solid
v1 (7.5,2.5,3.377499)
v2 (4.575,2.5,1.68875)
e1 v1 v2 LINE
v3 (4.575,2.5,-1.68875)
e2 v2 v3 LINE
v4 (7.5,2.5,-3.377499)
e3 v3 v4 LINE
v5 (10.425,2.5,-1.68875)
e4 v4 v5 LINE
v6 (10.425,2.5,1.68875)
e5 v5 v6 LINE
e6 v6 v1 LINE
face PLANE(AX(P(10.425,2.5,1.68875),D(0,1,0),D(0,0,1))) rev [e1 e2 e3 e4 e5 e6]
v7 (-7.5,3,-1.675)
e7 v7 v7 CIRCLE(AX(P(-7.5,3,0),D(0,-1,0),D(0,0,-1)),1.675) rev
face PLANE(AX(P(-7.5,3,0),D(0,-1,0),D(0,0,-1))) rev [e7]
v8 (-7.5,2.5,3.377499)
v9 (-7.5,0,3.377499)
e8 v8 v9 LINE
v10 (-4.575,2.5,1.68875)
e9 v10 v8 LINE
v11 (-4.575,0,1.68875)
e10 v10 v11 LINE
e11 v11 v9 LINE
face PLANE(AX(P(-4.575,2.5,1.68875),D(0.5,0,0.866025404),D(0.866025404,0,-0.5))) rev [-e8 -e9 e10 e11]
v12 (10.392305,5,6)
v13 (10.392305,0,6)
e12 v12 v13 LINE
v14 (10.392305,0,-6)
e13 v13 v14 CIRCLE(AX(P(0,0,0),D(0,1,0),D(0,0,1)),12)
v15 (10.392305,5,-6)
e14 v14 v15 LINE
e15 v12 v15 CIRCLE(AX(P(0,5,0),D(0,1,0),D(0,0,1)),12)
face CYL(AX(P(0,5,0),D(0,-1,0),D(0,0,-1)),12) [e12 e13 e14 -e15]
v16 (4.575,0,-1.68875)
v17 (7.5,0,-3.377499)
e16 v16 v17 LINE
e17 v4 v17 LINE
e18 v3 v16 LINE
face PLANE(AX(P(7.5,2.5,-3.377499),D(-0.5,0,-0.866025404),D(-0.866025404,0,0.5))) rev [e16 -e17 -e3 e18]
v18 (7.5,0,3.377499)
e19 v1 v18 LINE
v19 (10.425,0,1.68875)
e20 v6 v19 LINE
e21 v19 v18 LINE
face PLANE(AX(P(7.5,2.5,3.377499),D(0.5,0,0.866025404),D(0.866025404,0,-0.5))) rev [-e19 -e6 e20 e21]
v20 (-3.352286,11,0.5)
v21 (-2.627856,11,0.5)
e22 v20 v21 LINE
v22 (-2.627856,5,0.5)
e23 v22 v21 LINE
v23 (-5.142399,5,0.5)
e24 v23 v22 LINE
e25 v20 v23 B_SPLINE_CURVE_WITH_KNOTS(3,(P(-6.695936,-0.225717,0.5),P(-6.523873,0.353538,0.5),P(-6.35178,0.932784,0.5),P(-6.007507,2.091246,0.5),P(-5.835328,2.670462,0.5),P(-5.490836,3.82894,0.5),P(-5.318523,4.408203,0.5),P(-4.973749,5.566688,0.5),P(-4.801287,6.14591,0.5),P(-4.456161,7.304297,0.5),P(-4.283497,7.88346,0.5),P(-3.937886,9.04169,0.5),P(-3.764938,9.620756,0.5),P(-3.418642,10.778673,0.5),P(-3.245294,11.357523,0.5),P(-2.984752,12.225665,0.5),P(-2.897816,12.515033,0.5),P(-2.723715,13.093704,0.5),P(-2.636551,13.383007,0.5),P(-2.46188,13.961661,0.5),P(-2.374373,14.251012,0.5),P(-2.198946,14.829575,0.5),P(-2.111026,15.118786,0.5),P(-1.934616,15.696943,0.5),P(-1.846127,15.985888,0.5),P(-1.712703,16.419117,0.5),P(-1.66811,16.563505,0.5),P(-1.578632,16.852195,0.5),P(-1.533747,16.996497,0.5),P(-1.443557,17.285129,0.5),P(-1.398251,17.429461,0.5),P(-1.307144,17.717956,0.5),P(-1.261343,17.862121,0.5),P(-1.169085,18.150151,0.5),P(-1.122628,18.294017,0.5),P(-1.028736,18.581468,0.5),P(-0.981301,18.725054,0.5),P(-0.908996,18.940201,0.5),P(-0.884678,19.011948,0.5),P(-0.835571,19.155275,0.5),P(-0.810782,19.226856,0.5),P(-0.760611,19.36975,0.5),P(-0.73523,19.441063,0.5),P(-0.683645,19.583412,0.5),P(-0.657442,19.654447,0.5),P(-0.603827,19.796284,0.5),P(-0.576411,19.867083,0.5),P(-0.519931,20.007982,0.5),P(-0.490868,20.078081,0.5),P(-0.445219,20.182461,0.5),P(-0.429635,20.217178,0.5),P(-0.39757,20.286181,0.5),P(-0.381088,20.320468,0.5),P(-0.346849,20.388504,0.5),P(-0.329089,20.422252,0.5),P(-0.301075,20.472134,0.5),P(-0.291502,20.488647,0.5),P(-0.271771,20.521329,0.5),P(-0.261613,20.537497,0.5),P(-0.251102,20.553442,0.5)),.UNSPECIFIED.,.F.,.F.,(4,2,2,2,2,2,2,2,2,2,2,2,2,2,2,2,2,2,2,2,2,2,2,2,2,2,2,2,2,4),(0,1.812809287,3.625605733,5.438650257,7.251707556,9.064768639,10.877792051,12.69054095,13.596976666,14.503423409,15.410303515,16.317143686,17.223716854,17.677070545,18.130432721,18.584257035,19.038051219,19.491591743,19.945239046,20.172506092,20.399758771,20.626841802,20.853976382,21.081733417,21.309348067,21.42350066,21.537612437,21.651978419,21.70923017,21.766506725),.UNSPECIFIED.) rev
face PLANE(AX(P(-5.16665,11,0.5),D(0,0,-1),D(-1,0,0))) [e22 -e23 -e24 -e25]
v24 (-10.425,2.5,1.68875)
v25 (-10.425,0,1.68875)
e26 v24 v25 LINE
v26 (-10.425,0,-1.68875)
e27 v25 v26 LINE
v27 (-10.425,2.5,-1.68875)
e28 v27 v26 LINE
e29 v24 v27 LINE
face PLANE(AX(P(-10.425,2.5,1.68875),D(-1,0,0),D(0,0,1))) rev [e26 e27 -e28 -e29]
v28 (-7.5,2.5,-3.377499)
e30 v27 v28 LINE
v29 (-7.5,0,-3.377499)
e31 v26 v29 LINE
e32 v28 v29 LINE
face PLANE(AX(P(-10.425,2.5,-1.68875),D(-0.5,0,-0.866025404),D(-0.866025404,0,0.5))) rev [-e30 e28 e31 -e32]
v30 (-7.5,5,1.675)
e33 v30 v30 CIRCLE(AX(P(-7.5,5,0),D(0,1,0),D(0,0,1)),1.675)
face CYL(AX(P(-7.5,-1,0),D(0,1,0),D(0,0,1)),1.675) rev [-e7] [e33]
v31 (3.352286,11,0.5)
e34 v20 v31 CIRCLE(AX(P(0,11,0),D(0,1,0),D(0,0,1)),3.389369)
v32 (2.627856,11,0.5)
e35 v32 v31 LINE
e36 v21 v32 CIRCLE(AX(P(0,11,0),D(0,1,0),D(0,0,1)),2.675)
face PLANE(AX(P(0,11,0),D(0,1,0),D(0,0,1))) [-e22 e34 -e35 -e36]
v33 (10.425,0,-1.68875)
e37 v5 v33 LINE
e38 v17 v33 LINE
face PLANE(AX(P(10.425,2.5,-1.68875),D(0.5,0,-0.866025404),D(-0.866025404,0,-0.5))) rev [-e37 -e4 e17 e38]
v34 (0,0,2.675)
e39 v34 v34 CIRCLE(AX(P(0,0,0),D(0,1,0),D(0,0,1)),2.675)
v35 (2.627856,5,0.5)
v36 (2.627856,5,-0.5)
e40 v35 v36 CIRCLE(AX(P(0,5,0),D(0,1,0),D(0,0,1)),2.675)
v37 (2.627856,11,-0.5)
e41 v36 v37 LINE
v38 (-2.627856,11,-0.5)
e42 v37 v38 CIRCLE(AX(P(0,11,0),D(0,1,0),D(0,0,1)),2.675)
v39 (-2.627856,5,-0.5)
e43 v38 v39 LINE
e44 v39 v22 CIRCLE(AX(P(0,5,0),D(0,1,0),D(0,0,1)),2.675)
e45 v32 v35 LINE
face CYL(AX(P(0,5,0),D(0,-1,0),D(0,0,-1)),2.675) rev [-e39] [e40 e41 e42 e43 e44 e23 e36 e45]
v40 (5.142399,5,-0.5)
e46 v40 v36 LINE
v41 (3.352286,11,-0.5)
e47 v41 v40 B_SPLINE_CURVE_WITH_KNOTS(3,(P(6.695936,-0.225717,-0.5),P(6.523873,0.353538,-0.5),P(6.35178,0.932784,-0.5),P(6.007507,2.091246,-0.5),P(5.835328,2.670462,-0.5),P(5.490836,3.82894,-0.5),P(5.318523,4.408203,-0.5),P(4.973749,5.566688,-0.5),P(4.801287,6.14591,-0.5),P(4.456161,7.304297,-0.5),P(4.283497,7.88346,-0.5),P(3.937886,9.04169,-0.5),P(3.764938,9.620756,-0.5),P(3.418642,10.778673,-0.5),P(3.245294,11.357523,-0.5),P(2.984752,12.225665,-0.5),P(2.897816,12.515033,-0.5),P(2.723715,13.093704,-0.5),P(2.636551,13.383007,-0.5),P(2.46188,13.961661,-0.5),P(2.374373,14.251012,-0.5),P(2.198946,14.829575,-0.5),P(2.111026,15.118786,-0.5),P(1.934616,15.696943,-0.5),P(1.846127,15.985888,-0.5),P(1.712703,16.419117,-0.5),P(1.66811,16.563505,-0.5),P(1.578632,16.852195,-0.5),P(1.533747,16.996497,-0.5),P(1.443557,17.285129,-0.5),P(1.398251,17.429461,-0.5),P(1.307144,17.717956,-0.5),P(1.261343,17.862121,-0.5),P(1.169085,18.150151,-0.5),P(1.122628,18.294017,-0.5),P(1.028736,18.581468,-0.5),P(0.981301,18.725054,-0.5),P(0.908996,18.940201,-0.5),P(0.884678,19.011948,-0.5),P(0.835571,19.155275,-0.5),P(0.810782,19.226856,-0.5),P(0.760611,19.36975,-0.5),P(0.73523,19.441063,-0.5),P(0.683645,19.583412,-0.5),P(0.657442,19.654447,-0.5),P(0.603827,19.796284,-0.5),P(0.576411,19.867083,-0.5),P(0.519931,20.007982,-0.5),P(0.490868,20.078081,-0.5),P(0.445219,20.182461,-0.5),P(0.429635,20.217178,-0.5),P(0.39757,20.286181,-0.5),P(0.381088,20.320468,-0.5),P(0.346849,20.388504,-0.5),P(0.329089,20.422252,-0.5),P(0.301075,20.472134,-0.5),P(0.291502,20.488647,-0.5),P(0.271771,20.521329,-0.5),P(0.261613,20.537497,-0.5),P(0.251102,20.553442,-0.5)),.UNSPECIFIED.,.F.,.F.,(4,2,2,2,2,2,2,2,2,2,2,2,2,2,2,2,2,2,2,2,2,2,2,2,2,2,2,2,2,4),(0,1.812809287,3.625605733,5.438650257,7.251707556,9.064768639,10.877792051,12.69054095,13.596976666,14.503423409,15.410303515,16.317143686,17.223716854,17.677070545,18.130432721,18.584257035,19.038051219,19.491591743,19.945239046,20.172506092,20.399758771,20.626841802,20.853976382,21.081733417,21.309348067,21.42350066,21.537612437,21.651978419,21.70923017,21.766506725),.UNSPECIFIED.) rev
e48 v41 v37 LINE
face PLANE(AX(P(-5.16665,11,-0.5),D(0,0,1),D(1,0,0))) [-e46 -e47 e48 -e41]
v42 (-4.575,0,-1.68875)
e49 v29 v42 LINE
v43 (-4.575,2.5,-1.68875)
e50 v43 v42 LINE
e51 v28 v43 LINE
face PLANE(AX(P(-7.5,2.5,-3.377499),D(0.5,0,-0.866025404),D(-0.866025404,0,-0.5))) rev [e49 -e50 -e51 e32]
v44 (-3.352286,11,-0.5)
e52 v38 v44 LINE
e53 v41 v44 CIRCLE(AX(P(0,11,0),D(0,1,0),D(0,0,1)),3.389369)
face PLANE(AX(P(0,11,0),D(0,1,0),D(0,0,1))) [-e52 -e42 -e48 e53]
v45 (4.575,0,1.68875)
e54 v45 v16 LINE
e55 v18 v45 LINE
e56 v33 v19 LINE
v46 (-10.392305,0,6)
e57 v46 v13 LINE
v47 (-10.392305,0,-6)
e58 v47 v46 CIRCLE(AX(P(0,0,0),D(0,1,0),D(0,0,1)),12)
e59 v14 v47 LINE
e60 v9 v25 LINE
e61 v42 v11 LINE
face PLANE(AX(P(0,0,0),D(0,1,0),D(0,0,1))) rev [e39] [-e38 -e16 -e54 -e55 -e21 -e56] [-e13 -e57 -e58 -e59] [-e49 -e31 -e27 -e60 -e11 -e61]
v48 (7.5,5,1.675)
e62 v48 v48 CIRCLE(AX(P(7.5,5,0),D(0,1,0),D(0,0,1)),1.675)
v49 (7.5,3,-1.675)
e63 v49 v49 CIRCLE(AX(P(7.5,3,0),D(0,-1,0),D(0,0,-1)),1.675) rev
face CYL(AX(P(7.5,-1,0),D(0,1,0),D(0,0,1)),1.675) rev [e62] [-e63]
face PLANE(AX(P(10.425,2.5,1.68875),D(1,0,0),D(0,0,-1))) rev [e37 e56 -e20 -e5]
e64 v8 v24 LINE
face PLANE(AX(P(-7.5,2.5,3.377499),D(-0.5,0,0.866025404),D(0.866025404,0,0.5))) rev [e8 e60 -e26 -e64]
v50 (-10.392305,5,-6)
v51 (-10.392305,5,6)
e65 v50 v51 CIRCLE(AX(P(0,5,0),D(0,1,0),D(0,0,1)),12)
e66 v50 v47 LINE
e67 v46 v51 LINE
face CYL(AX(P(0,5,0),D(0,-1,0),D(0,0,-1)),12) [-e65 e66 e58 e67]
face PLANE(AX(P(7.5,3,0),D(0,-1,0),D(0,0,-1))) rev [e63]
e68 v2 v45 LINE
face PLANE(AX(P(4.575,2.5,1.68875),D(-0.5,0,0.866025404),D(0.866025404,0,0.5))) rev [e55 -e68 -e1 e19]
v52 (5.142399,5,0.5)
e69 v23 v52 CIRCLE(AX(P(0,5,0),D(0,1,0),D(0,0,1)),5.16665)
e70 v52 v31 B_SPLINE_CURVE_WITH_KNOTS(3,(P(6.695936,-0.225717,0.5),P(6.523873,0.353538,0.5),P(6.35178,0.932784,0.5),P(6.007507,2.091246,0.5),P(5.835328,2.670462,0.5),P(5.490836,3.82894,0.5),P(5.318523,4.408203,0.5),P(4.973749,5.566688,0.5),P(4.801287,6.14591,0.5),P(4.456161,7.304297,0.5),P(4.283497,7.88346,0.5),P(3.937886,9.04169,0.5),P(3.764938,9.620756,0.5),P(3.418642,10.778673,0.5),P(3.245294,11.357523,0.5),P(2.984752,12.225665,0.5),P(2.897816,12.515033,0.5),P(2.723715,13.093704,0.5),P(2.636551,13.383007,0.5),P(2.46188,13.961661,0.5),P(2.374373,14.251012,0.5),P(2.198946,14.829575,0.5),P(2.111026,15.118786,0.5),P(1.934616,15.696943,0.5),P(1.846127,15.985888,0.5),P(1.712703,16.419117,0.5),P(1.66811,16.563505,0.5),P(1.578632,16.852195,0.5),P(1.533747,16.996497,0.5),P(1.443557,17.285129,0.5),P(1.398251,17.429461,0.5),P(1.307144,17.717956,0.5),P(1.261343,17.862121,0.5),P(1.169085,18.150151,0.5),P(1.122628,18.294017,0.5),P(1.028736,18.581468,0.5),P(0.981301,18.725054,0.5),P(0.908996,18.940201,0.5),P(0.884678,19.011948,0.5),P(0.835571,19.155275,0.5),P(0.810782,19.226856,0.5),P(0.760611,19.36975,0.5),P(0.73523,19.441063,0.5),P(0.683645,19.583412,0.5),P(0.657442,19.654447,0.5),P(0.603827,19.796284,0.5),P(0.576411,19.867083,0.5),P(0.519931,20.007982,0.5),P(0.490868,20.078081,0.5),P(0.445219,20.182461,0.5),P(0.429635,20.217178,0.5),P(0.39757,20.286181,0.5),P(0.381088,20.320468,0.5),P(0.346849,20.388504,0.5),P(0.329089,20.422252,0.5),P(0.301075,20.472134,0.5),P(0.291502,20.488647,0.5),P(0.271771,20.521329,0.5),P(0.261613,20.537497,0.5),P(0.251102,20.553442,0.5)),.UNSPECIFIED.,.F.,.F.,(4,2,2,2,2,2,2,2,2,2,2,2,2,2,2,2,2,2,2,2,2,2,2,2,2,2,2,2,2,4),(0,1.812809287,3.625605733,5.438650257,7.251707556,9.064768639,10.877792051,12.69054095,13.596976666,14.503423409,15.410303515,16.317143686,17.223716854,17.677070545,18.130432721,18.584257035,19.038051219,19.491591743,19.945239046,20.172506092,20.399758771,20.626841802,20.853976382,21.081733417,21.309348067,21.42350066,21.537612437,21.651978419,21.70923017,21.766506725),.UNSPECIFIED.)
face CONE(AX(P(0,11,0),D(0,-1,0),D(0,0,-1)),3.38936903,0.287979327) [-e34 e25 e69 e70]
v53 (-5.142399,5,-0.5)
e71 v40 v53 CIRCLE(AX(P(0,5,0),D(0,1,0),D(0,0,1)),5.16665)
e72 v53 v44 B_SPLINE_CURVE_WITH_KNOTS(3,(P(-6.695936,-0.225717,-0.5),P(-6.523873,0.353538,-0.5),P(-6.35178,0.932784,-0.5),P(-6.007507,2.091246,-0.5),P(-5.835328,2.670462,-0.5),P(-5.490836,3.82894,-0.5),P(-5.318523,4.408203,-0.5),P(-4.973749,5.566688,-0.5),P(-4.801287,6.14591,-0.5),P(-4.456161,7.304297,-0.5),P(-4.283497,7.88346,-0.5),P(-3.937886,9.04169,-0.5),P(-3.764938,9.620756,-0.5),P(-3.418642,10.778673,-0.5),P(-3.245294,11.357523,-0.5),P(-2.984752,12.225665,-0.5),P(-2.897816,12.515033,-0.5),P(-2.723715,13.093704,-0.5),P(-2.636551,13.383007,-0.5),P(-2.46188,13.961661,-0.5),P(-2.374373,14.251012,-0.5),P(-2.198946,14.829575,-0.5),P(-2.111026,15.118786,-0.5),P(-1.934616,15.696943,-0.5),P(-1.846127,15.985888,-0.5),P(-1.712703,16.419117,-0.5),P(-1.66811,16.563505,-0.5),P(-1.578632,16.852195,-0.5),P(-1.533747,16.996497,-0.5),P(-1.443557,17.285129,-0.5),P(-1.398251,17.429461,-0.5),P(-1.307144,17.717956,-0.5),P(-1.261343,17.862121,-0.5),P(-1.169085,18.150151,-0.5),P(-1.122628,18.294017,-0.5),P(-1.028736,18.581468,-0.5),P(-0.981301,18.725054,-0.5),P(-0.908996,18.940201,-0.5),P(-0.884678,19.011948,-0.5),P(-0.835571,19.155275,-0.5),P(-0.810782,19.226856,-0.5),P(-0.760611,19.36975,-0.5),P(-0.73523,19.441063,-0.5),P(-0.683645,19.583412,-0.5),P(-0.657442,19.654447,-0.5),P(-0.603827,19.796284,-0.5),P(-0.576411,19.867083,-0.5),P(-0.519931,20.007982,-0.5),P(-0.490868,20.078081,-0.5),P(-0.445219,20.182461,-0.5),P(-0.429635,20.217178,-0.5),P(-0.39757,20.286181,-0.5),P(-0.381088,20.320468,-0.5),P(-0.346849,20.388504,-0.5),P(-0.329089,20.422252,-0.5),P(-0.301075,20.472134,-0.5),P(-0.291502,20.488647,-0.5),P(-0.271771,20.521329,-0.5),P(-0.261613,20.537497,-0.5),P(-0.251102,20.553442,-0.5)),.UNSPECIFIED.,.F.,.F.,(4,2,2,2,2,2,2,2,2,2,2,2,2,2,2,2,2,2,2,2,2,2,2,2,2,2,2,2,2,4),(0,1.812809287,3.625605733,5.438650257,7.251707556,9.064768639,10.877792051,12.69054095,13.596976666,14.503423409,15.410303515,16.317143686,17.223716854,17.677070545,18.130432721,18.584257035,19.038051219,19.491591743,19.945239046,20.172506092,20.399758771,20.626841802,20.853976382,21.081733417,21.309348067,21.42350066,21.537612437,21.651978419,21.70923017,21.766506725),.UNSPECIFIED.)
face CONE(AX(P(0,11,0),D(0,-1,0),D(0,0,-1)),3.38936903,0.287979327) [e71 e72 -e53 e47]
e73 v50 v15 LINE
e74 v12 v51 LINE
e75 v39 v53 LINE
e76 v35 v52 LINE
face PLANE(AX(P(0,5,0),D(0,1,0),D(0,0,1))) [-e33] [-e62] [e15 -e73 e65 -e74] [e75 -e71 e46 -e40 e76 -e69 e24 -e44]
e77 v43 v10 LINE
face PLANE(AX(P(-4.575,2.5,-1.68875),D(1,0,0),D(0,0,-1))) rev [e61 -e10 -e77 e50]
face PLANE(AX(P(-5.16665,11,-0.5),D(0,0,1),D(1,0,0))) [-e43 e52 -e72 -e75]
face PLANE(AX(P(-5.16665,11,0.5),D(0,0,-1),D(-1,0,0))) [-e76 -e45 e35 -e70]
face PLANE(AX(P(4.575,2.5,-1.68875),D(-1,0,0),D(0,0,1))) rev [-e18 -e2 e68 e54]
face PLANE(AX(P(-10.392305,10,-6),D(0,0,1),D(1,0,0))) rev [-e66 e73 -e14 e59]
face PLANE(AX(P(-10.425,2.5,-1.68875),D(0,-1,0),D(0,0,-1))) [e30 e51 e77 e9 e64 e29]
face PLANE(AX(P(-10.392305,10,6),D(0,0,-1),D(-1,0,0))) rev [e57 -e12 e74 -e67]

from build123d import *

# Parameters (mm, degrees)
SKETCH1_R           = 12
SKETCH1_R_2         = 2.675
BOSS_EXTRUDE1_DEPTH = 5
SKETCH2_R           = 5.16665
SKETCH2_R_2         = 2.675
BOSS_EXTRUDE2_DEPTH = 6
CHAMFER1_SIZE       = 6
CHAMFER1_SIZE_2     = 1.77728097
SKETCH3_R           = 1.675
CUT_EXTRUDE1_DEPTH  = 6
CUT_EXTRUDE2_DEPTH  = 2.5
SKETCH5_W           = 10.3333
SKETCH5_H           = 1
CUT_EXTRUDE3_DEPTH  = 6
CUT_EXTRUDE4_DEPTH  = 10
BOSS_EXTRUDE3_START = -0.5
SKETCH7_R           = 1.706123363
SKETCH7_R_2         = 1.675
BOSS_EXTRUDE3_DEPTH = 0.5


with BuildPart() as part:
    # Sketch1 → Boss-Extrude1 (new body)
    with BuildSketch(Plane(origin=(0, 0, 0), x_dir=(1, 0, 0), z_dir=(0, 1, 0))):
        with Locations(Location((0, 0, 0), (0, 0, 270))):
            Circle(SKETCH1_R)
        with Locations(Location((0, 0, 0), (0, 0, 270))):
            Circle(SKETCH1_R_2, mode=Mode.SUBTRACT)
    extrude(amount=BOSS_EXTRUDE1_DEPTH)

    # Sketch2 → Boss-Extrude2 (add)
    with BuildSketch(Plane(origin=(0, 5, 0), x_dir=(1, 0, 0), z_dir=(0, 1, 0))):
        with Locations(Location((0, 0, 0), (0, 0, 270))):
            Circle(SKETCH2_R)
        with Locations(Location((0, 0, 0), (0, 0, 270))):
            Circle(SKETCH2_R_2, mode=Mode.SUBTRACT)
    extrude(amount=BOSS_EXTRUDE2_DEPTH)

    # Chamfer1
    # the kernel refuses this chamfer: 6, 1.77728097 mm, written as the material it takes off along each edge
    with BuildSketch(Plane(origin=(0, 11, 0), x_dir=(0, 0, 1), z_dir=(-1, 0, 0))) as chamfer1_piece_1_section:
        Polygon((5.16665, -CHAMFER1_SIZE), (5.16665 - CHAMFER1_SIZE_2, 0), (5.16665, 0), align=None)
    chamfer1_piece_1 = revolve(axis=Axis((0, 11, 0), (0, 1, 0)), mode=Mode.PRIVATE)
    chamfer1_piece_1 = split(chamfer1_piece_1, bisect_by=Plane(origin=(0, 5, -4.298679157), z_dir=(0, 1, 0)), keep=Keep.TOP, mode=Mode.PRIVATE)
    add(chamfer1_piece_1, mode=Mode.SUBTRACT)

    # Sketch3 → Cut-Extrude1 (cut)
    with BuildSketch(Plane(origin=(0, 5, 0), x_dir=(1, 0, 0), z_dir=(0, 1, 0))):
        with Locations(Location((-7.5, 0, 0), (0, 0, 270))):
            Circle(SKETCH3_R)
        with Locations(Location((7.5, 0, 0), (0, 0, 270))):
            Circle(SKETCH3_R)
    extrude(amount=-CUT_EXTRUDE1_DEPTH, mode=Mode.SUBTRACT)

    # Sketch4 → Cut-Extrude2 (cut)
    with BuildSketch(Plane.XZ):
        Polygon((-10.425, -1.688749537), (-7.5, -3.377499075), (-4.575, -1.688749537), (-4.575, 1.688749537), (-7.5, 3.377499075), (-10.425, 1.688749537), align=None)
        Polygon((10.425, 1.688749537), (10.425, -1.688749537), (7.5, -3.377499075), (4.575, -1.688749537), (4.575, 1.688749537), (7.5, 3.377499075), align=None)
    extrude(amount=-CUT_EXTRUDE2_DEPTH, mode=Mode.SUBTRACT)

    # Sketch5 → Cut-Extrude3 (cut)
    with BuildSketch(Plane(origin=(0, 5, 0), x_dir=(1, 0, 0), z_dir=(0, 1, 0))):
        Rectangle(SKETCH5_W, SKETCH5_H)
    extrude(amount=CUT_EXTRUDE3_DEPTH, mode=Mode.SUBTRACT)

    # Sketch6 → Cut-Extrude4 (cut)
    with BuildSketch(Plane.XZ):
        with BuildLine():
            Line((-10.392304845, 6), (10.392304845, 6))
            ThreePointArc((10.392304845, 6), (0, 12), (-10.392304845, 6))
        make_face()
        with BuildLine():
            Line((-10.392304845, -6), (10.392304845, -6))
            ThreePointArc((10.392304845, -6), (0, -12), (-10.392304845, -6))
        make_face()
    extrude(amount=-CUT_EXTRUDE4_DEPTH, mode=Mode.SUBTRACT)

    # Sketch7 → Boss-Extrude3 (add)
    with BuildSketch(Plane.XZ.offset(-2.5).offset(BOSS_EXTRUDE3_START)):
        with Locations((7.5, 0)):
            Circle(SKETCH7_R)
        with Locations(Location((-7.5, 0, 0), (0, 0, 90))):
            Circle(SKETCH7_R_2)
    extrude(amount=BOSS_EXTRUDE3_DEPTH)


solid = part.part
